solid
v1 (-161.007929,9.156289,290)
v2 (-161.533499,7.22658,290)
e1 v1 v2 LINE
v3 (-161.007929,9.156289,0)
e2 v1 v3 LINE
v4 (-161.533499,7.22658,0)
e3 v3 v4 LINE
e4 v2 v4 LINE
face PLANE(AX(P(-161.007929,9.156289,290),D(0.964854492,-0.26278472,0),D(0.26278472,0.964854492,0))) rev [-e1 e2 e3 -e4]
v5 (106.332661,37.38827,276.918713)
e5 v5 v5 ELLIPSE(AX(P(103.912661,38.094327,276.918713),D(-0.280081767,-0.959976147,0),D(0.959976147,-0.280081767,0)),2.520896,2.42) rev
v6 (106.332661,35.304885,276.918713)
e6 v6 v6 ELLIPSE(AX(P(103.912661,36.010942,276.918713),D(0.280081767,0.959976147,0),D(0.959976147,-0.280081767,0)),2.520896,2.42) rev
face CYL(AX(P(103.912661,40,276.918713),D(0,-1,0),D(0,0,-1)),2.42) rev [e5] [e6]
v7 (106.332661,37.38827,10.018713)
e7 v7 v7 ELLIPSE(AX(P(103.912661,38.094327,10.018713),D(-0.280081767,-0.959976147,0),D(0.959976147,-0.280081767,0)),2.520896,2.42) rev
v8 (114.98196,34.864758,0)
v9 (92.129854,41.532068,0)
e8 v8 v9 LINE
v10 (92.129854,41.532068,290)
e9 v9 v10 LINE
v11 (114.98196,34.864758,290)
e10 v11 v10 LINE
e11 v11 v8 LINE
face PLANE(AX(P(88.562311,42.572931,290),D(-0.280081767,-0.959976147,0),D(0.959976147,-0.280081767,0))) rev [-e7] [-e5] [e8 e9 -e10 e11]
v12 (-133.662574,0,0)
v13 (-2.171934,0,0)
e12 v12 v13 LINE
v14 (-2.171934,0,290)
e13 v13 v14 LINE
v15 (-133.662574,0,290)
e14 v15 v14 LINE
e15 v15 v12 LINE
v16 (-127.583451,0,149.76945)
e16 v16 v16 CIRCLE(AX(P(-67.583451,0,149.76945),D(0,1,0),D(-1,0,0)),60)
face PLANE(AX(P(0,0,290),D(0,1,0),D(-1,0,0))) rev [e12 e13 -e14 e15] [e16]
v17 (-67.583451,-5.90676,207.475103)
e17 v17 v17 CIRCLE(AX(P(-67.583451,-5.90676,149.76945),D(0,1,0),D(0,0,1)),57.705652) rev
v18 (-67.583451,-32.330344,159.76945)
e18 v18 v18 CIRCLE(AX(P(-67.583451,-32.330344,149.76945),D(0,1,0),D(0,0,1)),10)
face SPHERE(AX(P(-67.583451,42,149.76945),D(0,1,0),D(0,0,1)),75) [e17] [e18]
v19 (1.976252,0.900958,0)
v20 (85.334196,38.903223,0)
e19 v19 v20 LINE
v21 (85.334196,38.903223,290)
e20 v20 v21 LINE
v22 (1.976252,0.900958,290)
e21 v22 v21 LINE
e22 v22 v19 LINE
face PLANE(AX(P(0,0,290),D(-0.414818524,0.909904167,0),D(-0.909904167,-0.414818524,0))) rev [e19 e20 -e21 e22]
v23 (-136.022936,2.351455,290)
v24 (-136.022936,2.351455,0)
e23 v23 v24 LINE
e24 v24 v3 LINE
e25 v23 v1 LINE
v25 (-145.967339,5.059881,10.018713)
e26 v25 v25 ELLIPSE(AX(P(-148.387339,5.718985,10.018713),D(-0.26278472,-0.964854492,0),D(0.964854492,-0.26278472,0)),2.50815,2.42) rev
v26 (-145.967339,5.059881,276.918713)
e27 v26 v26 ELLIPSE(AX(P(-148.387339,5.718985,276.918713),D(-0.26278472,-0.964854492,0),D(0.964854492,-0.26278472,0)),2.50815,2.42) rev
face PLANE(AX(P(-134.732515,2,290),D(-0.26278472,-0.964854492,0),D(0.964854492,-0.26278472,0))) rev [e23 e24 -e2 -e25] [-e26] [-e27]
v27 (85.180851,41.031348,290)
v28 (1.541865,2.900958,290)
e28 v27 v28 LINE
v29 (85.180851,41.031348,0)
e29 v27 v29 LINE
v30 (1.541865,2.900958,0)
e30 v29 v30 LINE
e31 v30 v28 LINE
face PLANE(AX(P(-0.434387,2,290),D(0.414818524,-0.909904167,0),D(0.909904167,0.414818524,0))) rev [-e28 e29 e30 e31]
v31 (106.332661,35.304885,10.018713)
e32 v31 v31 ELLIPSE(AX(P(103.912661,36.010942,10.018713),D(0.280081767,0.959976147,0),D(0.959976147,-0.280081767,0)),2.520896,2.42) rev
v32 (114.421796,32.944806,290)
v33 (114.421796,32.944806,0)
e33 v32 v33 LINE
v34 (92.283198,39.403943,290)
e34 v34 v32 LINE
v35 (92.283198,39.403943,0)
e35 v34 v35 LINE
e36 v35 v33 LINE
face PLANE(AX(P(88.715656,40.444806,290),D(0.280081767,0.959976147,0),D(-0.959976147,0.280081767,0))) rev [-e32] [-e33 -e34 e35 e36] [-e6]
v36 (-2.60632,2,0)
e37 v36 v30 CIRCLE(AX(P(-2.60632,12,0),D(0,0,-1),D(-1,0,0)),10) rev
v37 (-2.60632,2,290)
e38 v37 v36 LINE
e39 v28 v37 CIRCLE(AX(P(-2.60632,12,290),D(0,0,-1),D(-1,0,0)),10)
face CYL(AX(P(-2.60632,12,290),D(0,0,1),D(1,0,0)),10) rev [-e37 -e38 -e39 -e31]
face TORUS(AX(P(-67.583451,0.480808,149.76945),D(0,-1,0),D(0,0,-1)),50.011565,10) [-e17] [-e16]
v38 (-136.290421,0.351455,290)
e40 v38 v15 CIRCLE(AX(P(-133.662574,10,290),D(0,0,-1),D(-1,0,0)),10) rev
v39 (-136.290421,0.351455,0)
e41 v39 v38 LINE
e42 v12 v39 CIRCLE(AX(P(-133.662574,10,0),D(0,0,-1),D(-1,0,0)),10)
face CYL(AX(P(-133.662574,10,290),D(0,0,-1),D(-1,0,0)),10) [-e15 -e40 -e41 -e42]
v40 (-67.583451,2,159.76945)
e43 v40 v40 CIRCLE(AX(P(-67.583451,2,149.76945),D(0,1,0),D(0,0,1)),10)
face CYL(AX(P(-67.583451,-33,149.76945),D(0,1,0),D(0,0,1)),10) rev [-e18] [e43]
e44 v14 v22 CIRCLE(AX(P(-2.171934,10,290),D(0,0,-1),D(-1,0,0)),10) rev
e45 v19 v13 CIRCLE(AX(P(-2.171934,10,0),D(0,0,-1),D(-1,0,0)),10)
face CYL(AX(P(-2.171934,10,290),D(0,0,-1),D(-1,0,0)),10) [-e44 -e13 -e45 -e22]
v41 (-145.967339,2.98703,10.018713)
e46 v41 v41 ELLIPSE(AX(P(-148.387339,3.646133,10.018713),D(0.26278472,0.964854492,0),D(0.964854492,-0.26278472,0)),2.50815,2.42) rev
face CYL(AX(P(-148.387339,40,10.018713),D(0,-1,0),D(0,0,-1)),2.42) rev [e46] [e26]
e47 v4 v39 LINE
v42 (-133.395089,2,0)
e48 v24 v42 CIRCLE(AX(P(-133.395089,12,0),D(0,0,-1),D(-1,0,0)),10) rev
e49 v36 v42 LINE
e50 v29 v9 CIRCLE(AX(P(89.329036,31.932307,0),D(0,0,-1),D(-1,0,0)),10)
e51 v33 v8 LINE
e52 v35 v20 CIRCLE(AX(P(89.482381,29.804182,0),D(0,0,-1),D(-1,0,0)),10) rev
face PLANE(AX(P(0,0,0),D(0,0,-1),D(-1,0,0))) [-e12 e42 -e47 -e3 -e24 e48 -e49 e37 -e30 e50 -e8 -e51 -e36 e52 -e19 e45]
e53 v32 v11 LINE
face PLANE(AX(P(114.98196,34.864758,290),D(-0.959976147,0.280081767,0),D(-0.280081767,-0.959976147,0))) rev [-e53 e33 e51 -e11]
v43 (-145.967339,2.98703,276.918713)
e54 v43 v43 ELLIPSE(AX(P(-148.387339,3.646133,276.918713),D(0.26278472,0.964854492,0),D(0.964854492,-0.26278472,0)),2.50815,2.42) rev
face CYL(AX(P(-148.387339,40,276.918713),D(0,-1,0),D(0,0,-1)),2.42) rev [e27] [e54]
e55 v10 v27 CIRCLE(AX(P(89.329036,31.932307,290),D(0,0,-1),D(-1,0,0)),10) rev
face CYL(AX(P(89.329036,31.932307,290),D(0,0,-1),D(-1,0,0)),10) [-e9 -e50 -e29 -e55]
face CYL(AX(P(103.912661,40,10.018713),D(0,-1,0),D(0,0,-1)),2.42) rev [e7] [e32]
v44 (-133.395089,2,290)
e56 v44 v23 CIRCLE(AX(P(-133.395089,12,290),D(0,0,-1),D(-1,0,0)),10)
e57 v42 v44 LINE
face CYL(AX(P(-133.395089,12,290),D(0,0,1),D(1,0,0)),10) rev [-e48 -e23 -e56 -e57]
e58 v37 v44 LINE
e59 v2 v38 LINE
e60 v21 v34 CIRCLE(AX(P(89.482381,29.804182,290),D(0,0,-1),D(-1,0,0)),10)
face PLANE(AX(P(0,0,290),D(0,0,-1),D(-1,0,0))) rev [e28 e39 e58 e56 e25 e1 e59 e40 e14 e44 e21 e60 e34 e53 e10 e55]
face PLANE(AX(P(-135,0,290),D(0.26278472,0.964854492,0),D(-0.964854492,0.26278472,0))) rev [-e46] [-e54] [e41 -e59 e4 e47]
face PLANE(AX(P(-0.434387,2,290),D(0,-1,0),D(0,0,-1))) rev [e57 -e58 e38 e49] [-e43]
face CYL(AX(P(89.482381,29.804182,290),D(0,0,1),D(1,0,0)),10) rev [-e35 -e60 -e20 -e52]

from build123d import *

# Parameters (mm, degrees)
BOSS_EXTRUDE1_DEPTH = 290
SKETCH2_R           = 60
BOSS_EXTRUDE2_DEPTH = 5
DOME1_FACE_RADIUS   = 60
DOME1_HEIGHT        = 30
FILLET1_R           = 10
SKETCH3_R           = 10
CUT_EXTRUDE1_DEPTH  = 335.423734017
FILLET2_R           = 10
FILLET3_R           = 10
SKETCH8_R           = 2.42
SKETCH8_R_2         = 2.420000001
CUT_EXTRUDE2_DEPTH  = 40


with BuildPart() as part:
    # Sketch1 → Boss-Extrude1 (new body)
    with BuildSketch(Plane.XY):
        Polygon((0, 0), (-135, 0), (-161.533498532, 7.226579802), (-161.007929092, 9.156288786), (-134.732514829, 2), (-0.434386742, 2), (88.562311317, 42.572930951), (114.981959712, 34.864758374), (114.421796177, 32.944806079), (88.715656235, 40.444806079), align=None)
    extrude(amount=BOSS_EXTRUDE1_DEPTH)

    # Sketch2 → Boss-Extrude2 (add)
    with BuildSketch(Plane(origin=(0, 2, 0), x_dir=(1, 0, 0), z_dir=(0, 1, 0))):
        with Locations(Location((-67.583450785, -149.769450313, 0), (0, 0, 270))):
            Circle(SKETCH2_R)
    extrude(amount=-BOSS_EXTRUDE2_DEPTH)

    # Dome1: a dome of height H over a round flat face of radius A is a cap of a sphere of radius (A * A + H * H) / (2 * H)
    dome1_r = (DOME1_FACE_RADIUS * DOME1_FACE_RADIUS + DOME1_HEIGHT * DOME1_HEIGHT) / (2 * DOME1_HEIGHT)
    dome1_base = Plane((-67.583450785, -3, 149.769450313), z_dir=(0, -1, 0))
    with Locations(dome1_base.offset(DOME1_HEIGHT - dome1_r)):
        dome1_ball = Sphere(dome1_r, mode=Mode.PRIVATE)
    add(split(dome1_ball, bisect_by=dome1_base, keep=Keep.TOP, mode=Mode.PRIVATE))

    # Fillet1
    # the kernel refuses this fillet: 10 mm, written as the material it takes off along each edge
    with BuildSketch(Plane(origin=(-67.583450785, -3, 149.769450313), x_dir=(4.089410291877963e-12, 0, -1.0), z_dir=(1.0, 0, 4.089410291877963e-12))) as fillet1_piece_1:
        with BuildLine():
            CenterArc((50.011565498, 3.480807854), FILLET1_R, 320.300820282, 36.943291115)
            Line((57.705652497, -2.906760168), (57.859534237, -3.034511529))
            ThreePointArc((57.859534237, -3.034511529), (59.02775796, -1.591456193), (60.16, -0.12))
            Line((60.16, -0.12), (60.2, 0))
            ThreePointArc((60.2, 0), (60.2, 1.5), (60.19976869, 2.990383843))
            Line((60.19976869, 2.990383843), (60, 3))
        make_face()
    revolve(axis=Axis((-67.583450785, -3, 149.769450313), (0, 1, 0)), revolution_arc=180, mode=Mode.SUBTRACT)
    with BuildSketch(Plane(origin=(-67.583450785, -3, 149.769450313), x_dir=(0, 0, 1), z_dir=(-1, 0, 0))) as fillet1_piece_2:
        with BuildLine():
            CenterArc((50.011565498, 3.480807853), FILLET1_R, 320.300820281, 36.94329112)
            Line((57.705652497, -2.906760169), (57.859534237, -3.03451153))
            ThreePointArc((57.859534237, -3.03451153), (59.02775796, -1.591456194), (60.16, -0.12))
            Line((60.16, -0.12), (60.2, 0))
            ThreePointArc((60.2, 0), (60.2, 1.5), (60.19976869, 2.990383843))
            Line((60.19976869, 2.990383843), (60, 3))
        make_face()
    revolve(axis=Axis((-67.583450785, -3, 149.769450313), (0, 1, 0)), revolution_arc=180, mode=Mode.SUBTRACT)

    # Sketch3 → Cut-Extrude1 (cut, through all)
    with BuildSketch(Plane(origin=(0, 2, 0), x_dir=(1, 0, 0), z_dir=(0, 1, 0))):
        with Locations(Location((-67.583450785, -149.769450313, 0), (0, 0, 270))):
            Circle(SKETCH3_R)
    extrude(amount=-CUT_EXTRUDE1_DEPTH, mode=Mode.SUBTRACT)

    # Fillet2
    fillet2_edges = [part.edges().sort_by_distance(p)[0] for p in [
        (88.562311317, 42.572930951, 145),
        (88.715656235, 40.444806079, 145),
    ]]
    fillet(fillet2_edges, radius=FILLET2_R)

    # Fillet3
    fillet3_edges = [part.edges().sort_by_distance(p)[0] for p in [
        (0, 0, 145),
        (-135, 0, 145),
        (-134.732514829, 2, 145),
        (-0.434386742, 2, 145),
    ]]
    fillet(fillet3_edges, radius=FILLET3_R)

    # Sketch8 → Cut-Extrude2 (cut)
    with BuildSketch(Plane(origin=(0, 0, 0), x_dir=(1, 0, 0), z_dir=(0, 1, 0))):
        with Locations((-148.387339129, -10.01871293)):
            Circle(SKETCH8_R)
        with Locations((103.912660871, -10.01871293)):
            Circle(SKETCH8_R)
        with Locations((103.912660871, -276.91871293)):
            Circle(SKETCH8_R)
        with Locations((-148.387339129, -276.91871293)):
            Circle(SKETCH8_R_2)
    extrude(amount=CUT_EXTRUDE2_DEPTH, mode=Mode.SUBTRACT)


solid = part.part
